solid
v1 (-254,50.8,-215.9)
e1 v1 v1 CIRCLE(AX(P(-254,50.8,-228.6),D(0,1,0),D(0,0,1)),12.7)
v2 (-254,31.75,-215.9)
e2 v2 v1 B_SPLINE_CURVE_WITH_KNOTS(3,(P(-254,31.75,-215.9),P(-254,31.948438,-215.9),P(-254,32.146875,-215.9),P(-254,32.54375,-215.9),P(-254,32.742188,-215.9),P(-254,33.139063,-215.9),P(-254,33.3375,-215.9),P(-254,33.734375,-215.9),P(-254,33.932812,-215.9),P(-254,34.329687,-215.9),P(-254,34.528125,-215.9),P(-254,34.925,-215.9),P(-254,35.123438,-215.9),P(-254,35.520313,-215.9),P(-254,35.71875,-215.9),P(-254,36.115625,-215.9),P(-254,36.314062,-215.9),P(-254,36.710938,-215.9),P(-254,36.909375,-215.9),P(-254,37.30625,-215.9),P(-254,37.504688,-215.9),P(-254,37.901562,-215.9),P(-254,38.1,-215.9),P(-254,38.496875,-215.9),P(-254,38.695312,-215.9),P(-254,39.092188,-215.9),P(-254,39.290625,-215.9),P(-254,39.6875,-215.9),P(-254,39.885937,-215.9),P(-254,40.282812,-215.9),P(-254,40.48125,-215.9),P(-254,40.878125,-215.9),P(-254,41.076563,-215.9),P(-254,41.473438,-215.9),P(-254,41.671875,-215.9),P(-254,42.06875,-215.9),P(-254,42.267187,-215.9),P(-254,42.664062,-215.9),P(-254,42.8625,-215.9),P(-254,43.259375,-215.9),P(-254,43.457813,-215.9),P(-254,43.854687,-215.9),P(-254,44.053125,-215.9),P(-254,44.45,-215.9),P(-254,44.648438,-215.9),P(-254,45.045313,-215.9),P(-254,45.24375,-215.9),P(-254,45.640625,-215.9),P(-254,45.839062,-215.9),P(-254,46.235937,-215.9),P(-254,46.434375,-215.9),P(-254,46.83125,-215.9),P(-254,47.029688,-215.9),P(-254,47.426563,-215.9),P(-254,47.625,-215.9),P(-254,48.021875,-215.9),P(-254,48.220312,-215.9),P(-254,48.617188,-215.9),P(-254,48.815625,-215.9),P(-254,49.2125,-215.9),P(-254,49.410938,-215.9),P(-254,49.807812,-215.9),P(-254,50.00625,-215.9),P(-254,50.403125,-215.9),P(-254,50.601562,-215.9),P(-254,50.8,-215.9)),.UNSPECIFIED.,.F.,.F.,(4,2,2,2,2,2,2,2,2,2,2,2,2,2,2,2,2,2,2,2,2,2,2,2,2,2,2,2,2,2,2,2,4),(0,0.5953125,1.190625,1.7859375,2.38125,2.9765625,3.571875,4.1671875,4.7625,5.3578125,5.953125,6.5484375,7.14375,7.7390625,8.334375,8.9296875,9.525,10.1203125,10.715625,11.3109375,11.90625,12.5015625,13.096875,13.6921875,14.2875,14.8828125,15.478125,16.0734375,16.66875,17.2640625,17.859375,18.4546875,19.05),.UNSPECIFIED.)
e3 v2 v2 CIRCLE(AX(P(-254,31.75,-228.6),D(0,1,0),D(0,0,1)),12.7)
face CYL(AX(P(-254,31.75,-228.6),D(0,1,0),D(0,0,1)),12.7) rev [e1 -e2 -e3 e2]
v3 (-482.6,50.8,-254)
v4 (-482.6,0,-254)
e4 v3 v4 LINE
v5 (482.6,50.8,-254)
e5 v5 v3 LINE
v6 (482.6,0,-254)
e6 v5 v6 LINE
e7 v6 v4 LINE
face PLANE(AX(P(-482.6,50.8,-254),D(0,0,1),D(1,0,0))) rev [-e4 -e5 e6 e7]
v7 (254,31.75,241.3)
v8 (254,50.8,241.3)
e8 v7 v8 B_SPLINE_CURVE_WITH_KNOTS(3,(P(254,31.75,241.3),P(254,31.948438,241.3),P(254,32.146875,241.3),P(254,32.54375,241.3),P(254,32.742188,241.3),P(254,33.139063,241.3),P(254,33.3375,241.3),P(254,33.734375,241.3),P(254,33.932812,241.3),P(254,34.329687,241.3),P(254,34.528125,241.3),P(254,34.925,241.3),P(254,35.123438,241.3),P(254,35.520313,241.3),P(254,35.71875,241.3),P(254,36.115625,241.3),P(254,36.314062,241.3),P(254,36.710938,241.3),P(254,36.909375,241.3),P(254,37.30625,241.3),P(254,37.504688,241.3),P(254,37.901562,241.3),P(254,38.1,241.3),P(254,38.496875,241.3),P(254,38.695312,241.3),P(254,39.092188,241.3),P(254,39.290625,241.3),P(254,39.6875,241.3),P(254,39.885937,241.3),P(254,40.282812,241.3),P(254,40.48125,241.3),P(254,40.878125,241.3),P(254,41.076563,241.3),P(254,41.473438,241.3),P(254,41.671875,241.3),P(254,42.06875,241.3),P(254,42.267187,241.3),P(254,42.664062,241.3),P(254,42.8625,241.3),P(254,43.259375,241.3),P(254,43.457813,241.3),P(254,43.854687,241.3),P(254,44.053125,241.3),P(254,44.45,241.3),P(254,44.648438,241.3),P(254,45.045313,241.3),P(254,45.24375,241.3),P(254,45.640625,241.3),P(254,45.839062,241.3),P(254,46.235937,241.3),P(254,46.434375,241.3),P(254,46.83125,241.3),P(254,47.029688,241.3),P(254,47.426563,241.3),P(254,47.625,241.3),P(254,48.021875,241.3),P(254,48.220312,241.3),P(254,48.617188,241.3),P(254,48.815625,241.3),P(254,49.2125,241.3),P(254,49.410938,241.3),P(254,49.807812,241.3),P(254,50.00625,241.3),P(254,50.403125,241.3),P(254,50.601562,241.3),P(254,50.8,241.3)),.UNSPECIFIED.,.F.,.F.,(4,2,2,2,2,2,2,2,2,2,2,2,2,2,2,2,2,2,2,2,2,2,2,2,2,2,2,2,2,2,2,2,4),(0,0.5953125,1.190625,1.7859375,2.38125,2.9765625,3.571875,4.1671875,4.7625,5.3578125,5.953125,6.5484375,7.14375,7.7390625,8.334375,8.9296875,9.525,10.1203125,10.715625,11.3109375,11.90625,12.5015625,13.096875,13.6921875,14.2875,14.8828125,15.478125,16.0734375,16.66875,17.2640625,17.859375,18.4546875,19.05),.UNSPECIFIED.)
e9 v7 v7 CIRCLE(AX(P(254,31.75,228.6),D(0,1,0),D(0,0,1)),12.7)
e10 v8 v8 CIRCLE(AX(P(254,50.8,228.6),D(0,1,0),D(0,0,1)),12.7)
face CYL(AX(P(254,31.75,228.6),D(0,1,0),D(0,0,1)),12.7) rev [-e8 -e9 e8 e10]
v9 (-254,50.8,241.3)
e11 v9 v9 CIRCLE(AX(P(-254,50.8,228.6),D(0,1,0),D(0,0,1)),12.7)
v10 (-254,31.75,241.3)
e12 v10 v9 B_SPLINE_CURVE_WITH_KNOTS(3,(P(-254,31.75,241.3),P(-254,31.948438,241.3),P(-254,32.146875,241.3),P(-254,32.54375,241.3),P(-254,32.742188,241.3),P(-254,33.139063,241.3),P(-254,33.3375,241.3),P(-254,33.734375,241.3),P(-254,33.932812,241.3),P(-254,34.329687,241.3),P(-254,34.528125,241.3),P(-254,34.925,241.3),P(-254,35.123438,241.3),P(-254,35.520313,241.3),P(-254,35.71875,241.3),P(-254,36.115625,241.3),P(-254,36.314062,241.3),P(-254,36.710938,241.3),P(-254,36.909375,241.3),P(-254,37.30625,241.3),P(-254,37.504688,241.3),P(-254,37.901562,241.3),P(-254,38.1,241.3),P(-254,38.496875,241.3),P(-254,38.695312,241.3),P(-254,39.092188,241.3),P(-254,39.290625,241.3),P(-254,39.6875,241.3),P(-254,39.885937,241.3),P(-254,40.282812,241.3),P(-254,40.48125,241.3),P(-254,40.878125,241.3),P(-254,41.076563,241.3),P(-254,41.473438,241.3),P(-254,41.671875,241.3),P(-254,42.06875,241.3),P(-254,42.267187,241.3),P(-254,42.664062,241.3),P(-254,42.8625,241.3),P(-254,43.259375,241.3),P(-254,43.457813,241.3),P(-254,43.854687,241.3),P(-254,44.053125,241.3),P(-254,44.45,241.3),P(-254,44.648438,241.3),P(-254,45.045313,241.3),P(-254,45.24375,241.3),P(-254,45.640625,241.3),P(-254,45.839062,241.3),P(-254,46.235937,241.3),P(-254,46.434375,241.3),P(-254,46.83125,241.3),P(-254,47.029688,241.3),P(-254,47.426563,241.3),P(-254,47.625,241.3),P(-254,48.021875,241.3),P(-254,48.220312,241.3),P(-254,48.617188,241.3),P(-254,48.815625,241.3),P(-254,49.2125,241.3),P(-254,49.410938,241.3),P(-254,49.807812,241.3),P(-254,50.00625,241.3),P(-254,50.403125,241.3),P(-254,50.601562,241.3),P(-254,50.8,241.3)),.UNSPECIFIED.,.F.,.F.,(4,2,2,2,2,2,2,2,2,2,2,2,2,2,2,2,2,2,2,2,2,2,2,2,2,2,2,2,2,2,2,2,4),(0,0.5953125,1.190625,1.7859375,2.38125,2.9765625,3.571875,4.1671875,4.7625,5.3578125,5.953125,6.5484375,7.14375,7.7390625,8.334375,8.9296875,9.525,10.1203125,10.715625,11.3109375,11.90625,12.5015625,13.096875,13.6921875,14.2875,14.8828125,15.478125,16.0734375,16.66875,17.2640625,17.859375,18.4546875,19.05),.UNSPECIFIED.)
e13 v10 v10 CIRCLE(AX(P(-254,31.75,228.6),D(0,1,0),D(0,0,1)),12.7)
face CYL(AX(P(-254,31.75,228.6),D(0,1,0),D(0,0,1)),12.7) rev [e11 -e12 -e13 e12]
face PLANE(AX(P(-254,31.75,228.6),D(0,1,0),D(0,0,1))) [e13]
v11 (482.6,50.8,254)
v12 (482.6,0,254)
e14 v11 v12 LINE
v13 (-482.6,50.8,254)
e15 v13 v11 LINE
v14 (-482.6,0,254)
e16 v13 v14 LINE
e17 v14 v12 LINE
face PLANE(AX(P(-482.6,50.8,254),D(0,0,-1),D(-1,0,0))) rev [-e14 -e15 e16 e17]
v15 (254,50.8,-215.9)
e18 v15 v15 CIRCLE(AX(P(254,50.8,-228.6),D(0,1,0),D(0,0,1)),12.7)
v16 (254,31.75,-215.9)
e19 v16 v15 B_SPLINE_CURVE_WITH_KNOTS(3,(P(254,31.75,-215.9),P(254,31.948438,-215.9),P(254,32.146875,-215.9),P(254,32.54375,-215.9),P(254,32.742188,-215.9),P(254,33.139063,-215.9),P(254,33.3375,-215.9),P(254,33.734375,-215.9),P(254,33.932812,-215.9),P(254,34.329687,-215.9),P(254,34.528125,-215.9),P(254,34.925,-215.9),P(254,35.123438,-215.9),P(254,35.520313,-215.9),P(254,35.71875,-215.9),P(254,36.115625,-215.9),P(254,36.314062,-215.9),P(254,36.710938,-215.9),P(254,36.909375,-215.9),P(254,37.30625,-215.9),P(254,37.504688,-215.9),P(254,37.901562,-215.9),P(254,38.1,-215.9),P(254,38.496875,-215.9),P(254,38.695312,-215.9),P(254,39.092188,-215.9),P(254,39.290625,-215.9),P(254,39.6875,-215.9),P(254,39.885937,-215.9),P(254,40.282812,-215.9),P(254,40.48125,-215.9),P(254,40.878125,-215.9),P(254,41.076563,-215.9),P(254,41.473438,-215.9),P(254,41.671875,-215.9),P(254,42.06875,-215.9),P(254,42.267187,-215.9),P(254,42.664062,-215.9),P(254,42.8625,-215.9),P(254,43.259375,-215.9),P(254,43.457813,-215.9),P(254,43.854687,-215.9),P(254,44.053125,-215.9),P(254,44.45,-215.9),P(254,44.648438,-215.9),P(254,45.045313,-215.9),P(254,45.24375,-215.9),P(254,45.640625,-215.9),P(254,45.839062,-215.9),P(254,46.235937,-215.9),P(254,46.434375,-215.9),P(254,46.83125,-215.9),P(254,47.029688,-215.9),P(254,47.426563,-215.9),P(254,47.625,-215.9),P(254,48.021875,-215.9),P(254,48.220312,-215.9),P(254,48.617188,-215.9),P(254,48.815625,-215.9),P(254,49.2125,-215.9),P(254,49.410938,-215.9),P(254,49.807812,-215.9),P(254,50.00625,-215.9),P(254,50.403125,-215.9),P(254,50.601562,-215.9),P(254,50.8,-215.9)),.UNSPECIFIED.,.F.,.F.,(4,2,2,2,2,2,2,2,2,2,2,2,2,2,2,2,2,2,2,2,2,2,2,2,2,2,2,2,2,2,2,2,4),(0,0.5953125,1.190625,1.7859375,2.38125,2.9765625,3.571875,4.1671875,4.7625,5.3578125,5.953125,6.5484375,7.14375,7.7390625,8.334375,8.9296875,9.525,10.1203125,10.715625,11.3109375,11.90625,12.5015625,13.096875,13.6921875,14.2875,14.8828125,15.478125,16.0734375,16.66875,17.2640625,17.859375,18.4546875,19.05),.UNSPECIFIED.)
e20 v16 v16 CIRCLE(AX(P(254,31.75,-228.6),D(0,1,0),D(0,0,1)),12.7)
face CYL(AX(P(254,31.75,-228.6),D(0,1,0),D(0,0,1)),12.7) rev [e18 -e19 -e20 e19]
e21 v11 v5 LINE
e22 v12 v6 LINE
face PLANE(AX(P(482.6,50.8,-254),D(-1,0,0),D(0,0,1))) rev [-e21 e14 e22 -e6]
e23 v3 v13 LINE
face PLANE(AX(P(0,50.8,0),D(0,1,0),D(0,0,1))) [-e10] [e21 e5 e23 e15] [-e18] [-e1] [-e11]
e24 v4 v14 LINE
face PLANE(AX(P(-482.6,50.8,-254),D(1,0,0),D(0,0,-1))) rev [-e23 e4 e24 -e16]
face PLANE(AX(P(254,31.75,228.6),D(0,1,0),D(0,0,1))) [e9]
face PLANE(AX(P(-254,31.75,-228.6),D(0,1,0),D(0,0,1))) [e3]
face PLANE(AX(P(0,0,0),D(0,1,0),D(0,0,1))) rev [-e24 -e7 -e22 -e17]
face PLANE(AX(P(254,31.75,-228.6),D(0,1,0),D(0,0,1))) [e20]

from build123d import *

# Parameters (mm, degrees)
SKETCH1_W              = 965.2
SKETCH1_H              = 508
BOSS_EXTRUDE1_DEPTH    = 50.8
CUT_EXTRUDE3_START     = 31.75
CUT_EXTRUDE3_OUTLINE_R = 12.7
CUT_EXTRUDE3_DEPTH     = 19.05


# Read off the part's stored shape, not the designer's step: Cut-Extrude3
with BuildPart() as part:
    # Sketch1 → Boss-Extrude1 (new body)
    with BuildSketch(Plane(origin=(0, 0, 0), x_dir=(1, 0, 0), z_dir=(0, 1, 0))):
        Rectangle(SKETCH1_W, SKETCH1_H)
    extrude(amount=BOSS_EXTRUDE1_DEPTH)

    # Cut-Extrude3 outline → Cut-Extrude3 (cut)
    with BuildSketch(Plane(origin=(0, 0, 0), x_dir=(1, 0, 0), z_dir=(0, 1, 0)).offset(CUT_EXTRUDE3_START)):
        with Locations((-254, 228.6)):
            Circle(CUT_EXTRUDE3_OUTLINE_R)
        with Locations((-254, -228.6)):
            Circle(CUT_EXTRUDE3_OUTLINE_R)
        with Locations((254, -228.6)):
            Circle(CUT_EXTRUDE3_OUTLINE_R)
        with Locations((254, 228.6)):
            Circle(CUT_EXTRUDE3_OUTLINE_R)
    extrude(amount=CUT_EXTRUDE3_DEPTH, mode=Mode.SUBTRACT)


solid = part.part
